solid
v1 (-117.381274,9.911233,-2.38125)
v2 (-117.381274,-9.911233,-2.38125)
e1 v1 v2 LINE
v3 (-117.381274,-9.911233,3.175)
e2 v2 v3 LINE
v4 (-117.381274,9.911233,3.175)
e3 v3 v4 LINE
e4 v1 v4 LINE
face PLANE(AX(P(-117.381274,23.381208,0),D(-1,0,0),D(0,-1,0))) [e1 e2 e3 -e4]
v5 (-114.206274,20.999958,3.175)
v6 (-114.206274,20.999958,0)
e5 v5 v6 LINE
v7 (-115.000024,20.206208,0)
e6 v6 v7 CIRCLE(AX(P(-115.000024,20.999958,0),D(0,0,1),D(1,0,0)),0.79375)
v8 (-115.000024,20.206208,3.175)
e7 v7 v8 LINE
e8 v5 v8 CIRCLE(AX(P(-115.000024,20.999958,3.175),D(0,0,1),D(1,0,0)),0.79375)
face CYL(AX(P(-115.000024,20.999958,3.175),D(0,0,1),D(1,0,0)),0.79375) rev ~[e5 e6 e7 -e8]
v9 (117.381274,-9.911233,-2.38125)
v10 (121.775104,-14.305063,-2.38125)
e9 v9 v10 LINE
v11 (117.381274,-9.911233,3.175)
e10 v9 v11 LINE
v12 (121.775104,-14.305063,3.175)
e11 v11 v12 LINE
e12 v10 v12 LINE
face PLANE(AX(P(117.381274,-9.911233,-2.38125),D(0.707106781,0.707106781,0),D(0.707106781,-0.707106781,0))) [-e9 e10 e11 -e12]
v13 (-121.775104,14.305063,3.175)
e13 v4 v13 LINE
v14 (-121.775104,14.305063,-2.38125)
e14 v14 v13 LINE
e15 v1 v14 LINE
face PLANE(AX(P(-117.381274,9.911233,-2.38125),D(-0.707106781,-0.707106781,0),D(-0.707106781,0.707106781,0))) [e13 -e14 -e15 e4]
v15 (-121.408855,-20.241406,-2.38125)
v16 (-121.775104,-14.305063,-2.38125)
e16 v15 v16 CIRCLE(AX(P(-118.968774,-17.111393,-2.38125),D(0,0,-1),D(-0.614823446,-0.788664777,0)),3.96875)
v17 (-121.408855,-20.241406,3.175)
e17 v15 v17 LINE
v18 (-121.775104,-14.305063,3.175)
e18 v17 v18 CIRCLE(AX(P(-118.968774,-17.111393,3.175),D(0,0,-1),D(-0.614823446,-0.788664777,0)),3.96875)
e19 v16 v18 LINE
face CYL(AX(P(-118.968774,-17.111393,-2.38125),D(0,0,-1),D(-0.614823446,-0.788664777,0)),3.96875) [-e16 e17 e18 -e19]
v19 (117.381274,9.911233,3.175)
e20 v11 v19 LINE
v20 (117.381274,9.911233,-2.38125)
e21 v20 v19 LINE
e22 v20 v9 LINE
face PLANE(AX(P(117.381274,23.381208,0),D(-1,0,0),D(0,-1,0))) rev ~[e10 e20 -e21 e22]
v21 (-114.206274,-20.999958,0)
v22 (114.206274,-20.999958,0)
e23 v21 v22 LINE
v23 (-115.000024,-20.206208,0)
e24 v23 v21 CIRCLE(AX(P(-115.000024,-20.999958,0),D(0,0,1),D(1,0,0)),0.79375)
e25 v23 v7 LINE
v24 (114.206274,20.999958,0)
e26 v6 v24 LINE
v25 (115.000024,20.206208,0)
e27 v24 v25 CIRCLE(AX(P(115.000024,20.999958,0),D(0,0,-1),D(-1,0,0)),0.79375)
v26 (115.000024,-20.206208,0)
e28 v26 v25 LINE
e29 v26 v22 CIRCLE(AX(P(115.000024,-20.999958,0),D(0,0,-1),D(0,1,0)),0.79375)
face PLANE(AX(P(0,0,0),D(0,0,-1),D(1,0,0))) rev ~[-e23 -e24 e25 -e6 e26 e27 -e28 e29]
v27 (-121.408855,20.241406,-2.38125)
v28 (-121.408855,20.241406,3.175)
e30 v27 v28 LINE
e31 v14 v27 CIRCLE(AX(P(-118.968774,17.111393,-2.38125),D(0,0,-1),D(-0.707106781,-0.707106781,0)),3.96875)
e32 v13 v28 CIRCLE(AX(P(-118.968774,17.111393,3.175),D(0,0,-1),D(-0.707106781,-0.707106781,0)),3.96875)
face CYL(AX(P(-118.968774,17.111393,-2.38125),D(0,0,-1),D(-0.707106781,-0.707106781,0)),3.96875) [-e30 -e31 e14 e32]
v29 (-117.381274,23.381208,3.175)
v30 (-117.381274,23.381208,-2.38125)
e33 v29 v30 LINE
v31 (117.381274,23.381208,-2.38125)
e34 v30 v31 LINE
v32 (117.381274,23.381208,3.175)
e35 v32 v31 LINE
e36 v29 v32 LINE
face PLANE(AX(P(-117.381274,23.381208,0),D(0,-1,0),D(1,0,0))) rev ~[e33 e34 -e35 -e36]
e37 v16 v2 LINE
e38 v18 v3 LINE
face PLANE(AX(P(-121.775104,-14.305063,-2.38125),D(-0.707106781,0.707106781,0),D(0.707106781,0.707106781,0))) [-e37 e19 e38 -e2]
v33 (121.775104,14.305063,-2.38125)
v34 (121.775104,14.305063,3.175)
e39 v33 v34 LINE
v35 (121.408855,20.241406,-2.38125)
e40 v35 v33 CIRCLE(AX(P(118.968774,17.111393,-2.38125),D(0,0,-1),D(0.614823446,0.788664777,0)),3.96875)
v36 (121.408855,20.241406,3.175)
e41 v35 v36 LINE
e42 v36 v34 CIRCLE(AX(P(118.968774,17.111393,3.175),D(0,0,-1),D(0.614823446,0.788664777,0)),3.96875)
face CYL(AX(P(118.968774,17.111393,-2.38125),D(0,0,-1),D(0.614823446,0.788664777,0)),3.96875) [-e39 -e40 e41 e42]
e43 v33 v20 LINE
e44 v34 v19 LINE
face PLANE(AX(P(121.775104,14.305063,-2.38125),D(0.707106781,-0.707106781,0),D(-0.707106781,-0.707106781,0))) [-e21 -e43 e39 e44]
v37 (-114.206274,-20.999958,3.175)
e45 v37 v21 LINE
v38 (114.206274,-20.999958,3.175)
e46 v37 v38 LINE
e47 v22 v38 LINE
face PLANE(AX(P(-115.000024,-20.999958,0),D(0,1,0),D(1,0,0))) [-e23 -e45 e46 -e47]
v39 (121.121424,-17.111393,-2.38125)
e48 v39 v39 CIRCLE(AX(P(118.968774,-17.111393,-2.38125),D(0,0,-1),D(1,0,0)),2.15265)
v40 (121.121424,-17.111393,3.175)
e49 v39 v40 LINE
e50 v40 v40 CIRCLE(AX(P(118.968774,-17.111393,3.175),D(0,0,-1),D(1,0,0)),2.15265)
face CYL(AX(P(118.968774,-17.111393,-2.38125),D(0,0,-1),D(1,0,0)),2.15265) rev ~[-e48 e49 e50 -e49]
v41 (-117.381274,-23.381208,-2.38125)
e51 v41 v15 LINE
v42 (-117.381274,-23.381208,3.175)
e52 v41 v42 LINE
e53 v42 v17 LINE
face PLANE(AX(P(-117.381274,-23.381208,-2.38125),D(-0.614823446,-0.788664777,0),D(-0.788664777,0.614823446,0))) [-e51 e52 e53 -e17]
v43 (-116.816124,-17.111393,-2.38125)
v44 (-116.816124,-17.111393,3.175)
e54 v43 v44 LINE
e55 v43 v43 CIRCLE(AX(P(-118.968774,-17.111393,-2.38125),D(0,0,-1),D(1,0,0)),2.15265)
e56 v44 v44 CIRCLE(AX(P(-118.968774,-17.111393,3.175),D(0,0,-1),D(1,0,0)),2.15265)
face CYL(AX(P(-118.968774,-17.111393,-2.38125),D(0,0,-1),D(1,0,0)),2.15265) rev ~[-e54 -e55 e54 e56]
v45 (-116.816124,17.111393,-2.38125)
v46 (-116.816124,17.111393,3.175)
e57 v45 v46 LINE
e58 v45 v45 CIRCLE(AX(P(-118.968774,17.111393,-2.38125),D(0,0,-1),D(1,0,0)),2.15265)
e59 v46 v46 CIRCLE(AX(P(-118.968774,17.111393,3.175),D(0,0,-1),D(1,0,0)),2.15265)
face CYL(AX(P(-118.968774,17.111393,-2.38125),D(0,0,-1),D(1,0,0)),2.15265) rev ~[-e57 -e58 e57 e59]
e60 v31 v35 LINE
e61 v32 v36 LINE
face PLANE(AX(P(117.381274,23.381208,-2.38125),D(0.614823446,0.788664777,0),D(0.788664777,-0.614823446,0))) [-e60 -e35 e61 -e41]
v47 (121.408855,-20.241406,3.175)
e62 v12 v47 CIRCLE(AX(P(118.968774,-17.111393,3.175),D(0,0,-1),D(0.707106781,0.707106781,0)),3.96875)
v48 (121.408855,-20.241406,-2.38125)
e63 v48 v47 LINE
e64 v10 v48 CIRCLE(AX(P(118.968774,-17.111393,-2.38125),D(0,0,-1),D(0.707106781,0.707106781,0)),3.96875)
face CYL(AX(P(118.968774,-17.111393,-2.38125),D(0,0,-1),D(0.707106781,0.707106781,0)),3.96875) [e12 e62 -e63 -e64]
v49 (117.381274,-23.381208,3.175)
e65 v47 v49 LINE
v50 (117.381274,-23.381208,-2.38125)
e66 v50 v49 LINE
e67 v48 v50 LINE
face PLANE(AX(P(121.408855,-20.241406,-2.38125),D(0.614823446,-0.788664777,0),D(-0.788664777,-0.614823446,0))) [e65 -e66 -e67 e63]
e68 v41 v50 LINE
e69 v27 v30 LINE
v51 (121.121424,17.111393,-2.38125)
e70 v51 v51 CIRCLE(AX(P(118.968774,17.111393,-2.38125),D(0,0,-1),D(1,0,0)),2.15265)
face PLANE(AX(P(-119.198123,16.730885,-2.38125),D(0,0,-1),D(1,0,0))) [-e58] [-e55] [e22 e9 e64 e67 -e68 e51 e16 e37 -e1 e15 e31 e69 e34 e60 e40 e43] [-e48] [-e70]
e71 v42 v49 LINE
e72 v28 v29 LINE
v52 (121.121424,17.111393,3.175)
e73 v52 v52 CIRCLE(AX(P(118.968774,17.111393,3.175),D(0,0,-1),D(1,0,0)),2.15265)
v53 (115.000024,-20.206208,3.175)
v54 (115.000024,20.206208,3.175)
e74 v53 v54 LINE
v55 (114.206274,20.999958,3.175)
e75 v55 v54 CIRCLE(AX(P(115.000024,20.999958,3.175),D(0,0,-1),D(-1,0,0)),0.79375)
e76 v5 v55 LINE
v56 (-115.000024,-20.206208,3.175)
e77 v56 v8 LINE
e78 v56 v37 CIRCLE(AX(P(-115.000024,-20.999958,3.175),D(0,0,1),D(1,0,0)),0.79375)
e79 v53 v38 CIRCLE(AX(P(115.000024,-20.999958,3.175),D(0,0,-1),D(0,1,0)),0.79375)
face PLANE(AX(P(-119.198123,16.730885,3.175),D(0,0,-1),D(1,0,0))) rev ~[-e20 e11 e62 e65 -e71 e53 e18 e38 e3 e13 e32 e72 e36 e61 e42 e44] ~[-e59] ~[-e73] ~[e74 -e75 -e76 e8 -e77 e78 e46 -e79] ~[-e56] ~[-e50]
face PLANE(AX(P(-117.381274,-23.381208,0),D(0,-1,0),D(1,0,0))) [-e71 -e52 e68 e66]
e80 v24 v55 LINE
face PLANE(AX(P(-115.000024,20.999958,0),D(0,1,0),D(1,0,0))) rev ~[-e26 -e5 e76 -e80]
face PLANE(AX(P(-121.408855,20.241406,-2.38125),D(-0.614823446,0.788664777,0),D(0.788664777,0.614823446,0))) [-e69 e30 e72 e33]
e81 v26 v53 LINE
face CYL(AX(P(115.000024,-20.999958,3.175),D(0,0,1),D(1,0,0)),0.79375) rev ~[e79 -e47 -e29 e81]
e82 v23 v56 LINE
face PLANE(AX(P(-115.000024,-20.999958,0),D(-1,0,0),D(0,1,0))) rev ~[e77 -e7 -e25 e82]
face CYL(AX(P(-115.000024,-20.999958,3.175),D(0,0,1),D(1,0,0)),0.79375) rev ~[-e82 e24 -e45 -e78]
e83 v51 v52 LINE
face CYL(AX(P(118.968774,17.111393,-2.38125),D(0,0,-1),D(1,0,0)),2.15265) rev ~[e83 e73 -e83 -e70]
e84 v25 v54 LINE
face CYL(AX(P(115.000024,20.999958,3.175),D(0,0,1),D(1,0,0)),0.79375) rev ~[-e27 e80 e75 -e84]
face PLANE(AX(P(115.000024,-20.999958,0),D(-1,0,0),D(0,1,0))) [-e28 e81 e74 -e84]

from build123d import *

# Parameters (mm, degrees)
F0_W     = 234.762548
F0_H     = 46.762416
F0_W_2   = 230.000048
F0_H_2   = 41.999916
F1_DEPTH = 3.175
F2_W     = 234.762548
F2_H     = 46.762416
F3_DEPTH = 2.38125
F5_DEPTH = 5.55625
F6_R     = 2.15265
F7_DEPTH = 5.55625
F8_R     = 0.79375
F9_DEPTH = 3.175


# Not quite as in the source:
# - a length typed as a fraction of an inch, garbled in the dataset ("3 / 203.2 mm" for 3/8 in), is restored


with BuildPart() as f1:
    # F0 (on Top) → F1 (new body)
    with BuildSketch(Plane.XY):
        Rectangle(F0_W, F0_H)
        Rectangle(F0_W_2, F0_H_2, mode=Mode.SUBTRACT)
    extrude(amount=F1_DEPTH)

    # F2 (on face) → F3 (join)
    with BuildSketch(Plane(origin=(0, 0, 0), x_dir=(1, 0, 0), z_dir=(0, 0, -1))):
        Rectangle(F2_W, F2_H)
    extrude(amount=F3_DEPTH)

    # F4 (on face) → F5 (join, through all)
    with BuildSketch(Plane(origin=(0, 0, -2.38125), x_dir=(1, 0, 0), z_dir=(0, 0, -1))):
        with BuildLine():
            Line((-121.408854552, -20.241406366), (-117.381274, -23.381208))
            Line((-117.381274, -23.381208), (-117.381274, -9.9112329577))
            Line((-117.381274, -9.9112329577), (-121.7751040378, -14.3050629955))
            ThreePointArc((-121.7751040378, -14.3050629955), (-122.9299921425, -17.3557849119), (-121.408854552, -20.241406366))
        make_face()
        with BuildLine():
            Line((-117.381274, 9.9112329577), (-117.381274, 23.381208))
            Line((-117.381274, 23.381208), (-121.408854552, 20.241406366))
            ThreePointArc((-121.408854552, 20.241406366), (-122.9299921425, 17.3557849119), (-121.7751040378, 14.3050629955))
            Line((-121.7751040378, 14.3050629955), (-117.381274, 9.9112329577))
        make_face()
        with BuildLine():
            Line((117.381274, -9.9112329577), (117.381274, -23.381208))
            Line((117.381274, -23.381208), (121.408854552, -20.241406366))
            ThreePointArc((121.408854552, -20.241406366), (122.9299921425, -17.3557849119), (121.7751040378, -14.3050629955))
            Line((121.7751040378, -14.3050629955), (117.381274, -9.9112329577))
        make_face()
        with BuildLine():
            Line((121.408854552, 20.241406366), (117.381274, 23.381208))
            Line((117.381274, 23.381208), (117.381274, 9.9112329577))
            Line((117.381274, 9.9112329577), (121.7751040378, 14.3050629955))
            ThreePointArc((121.7751040378, 14.3050629955), (122.9299921425, 17.3557849119), (121.408854552, 20.241406366))
        make_face()
    extrude(amount=-F5_DEPTH)

    # F6 (on face) → F7 (cut, through all)
    with BuildSketch(Plane(origin=(0, 0, -2.38125), x_dir=(1, 0, 0), z_dir=(0, 0, -1))):
        with Locations((-118.968774, -17.1113930333)):
            Circle(F6_R)
        with Locations((-118.968774, 17.1113930333)):
            Circle(F6_R)
        with Locations((118.968774, 17.1113930333)):
            Circle(F6_R)
        with Locations((118.968774, -17.1113930333)):
            Circle(F6_R)
    extrude(amount=-F7_DEPTH, mode=Mode.SUBTRACT)

    # F8 (on face) → F9 (cut, through all)
    with BuildSketch(Plane.XY.offset(3.175)):
        with Locations((-115.000024, 20.999958)):
            Circle(F8_R)
        with Locations((-115.000024, -20.999958)):
            Circle(F8_R)
        with Locations((115.000024, -20.999958)):
            Circle(F8_R)
        with Locations((115.000024, 20.999958)):
            Circle(F8_R)
    extrude(amount=-F9_DEPTH, mode=Mode.SUBTRACT)


solid = f1.part
